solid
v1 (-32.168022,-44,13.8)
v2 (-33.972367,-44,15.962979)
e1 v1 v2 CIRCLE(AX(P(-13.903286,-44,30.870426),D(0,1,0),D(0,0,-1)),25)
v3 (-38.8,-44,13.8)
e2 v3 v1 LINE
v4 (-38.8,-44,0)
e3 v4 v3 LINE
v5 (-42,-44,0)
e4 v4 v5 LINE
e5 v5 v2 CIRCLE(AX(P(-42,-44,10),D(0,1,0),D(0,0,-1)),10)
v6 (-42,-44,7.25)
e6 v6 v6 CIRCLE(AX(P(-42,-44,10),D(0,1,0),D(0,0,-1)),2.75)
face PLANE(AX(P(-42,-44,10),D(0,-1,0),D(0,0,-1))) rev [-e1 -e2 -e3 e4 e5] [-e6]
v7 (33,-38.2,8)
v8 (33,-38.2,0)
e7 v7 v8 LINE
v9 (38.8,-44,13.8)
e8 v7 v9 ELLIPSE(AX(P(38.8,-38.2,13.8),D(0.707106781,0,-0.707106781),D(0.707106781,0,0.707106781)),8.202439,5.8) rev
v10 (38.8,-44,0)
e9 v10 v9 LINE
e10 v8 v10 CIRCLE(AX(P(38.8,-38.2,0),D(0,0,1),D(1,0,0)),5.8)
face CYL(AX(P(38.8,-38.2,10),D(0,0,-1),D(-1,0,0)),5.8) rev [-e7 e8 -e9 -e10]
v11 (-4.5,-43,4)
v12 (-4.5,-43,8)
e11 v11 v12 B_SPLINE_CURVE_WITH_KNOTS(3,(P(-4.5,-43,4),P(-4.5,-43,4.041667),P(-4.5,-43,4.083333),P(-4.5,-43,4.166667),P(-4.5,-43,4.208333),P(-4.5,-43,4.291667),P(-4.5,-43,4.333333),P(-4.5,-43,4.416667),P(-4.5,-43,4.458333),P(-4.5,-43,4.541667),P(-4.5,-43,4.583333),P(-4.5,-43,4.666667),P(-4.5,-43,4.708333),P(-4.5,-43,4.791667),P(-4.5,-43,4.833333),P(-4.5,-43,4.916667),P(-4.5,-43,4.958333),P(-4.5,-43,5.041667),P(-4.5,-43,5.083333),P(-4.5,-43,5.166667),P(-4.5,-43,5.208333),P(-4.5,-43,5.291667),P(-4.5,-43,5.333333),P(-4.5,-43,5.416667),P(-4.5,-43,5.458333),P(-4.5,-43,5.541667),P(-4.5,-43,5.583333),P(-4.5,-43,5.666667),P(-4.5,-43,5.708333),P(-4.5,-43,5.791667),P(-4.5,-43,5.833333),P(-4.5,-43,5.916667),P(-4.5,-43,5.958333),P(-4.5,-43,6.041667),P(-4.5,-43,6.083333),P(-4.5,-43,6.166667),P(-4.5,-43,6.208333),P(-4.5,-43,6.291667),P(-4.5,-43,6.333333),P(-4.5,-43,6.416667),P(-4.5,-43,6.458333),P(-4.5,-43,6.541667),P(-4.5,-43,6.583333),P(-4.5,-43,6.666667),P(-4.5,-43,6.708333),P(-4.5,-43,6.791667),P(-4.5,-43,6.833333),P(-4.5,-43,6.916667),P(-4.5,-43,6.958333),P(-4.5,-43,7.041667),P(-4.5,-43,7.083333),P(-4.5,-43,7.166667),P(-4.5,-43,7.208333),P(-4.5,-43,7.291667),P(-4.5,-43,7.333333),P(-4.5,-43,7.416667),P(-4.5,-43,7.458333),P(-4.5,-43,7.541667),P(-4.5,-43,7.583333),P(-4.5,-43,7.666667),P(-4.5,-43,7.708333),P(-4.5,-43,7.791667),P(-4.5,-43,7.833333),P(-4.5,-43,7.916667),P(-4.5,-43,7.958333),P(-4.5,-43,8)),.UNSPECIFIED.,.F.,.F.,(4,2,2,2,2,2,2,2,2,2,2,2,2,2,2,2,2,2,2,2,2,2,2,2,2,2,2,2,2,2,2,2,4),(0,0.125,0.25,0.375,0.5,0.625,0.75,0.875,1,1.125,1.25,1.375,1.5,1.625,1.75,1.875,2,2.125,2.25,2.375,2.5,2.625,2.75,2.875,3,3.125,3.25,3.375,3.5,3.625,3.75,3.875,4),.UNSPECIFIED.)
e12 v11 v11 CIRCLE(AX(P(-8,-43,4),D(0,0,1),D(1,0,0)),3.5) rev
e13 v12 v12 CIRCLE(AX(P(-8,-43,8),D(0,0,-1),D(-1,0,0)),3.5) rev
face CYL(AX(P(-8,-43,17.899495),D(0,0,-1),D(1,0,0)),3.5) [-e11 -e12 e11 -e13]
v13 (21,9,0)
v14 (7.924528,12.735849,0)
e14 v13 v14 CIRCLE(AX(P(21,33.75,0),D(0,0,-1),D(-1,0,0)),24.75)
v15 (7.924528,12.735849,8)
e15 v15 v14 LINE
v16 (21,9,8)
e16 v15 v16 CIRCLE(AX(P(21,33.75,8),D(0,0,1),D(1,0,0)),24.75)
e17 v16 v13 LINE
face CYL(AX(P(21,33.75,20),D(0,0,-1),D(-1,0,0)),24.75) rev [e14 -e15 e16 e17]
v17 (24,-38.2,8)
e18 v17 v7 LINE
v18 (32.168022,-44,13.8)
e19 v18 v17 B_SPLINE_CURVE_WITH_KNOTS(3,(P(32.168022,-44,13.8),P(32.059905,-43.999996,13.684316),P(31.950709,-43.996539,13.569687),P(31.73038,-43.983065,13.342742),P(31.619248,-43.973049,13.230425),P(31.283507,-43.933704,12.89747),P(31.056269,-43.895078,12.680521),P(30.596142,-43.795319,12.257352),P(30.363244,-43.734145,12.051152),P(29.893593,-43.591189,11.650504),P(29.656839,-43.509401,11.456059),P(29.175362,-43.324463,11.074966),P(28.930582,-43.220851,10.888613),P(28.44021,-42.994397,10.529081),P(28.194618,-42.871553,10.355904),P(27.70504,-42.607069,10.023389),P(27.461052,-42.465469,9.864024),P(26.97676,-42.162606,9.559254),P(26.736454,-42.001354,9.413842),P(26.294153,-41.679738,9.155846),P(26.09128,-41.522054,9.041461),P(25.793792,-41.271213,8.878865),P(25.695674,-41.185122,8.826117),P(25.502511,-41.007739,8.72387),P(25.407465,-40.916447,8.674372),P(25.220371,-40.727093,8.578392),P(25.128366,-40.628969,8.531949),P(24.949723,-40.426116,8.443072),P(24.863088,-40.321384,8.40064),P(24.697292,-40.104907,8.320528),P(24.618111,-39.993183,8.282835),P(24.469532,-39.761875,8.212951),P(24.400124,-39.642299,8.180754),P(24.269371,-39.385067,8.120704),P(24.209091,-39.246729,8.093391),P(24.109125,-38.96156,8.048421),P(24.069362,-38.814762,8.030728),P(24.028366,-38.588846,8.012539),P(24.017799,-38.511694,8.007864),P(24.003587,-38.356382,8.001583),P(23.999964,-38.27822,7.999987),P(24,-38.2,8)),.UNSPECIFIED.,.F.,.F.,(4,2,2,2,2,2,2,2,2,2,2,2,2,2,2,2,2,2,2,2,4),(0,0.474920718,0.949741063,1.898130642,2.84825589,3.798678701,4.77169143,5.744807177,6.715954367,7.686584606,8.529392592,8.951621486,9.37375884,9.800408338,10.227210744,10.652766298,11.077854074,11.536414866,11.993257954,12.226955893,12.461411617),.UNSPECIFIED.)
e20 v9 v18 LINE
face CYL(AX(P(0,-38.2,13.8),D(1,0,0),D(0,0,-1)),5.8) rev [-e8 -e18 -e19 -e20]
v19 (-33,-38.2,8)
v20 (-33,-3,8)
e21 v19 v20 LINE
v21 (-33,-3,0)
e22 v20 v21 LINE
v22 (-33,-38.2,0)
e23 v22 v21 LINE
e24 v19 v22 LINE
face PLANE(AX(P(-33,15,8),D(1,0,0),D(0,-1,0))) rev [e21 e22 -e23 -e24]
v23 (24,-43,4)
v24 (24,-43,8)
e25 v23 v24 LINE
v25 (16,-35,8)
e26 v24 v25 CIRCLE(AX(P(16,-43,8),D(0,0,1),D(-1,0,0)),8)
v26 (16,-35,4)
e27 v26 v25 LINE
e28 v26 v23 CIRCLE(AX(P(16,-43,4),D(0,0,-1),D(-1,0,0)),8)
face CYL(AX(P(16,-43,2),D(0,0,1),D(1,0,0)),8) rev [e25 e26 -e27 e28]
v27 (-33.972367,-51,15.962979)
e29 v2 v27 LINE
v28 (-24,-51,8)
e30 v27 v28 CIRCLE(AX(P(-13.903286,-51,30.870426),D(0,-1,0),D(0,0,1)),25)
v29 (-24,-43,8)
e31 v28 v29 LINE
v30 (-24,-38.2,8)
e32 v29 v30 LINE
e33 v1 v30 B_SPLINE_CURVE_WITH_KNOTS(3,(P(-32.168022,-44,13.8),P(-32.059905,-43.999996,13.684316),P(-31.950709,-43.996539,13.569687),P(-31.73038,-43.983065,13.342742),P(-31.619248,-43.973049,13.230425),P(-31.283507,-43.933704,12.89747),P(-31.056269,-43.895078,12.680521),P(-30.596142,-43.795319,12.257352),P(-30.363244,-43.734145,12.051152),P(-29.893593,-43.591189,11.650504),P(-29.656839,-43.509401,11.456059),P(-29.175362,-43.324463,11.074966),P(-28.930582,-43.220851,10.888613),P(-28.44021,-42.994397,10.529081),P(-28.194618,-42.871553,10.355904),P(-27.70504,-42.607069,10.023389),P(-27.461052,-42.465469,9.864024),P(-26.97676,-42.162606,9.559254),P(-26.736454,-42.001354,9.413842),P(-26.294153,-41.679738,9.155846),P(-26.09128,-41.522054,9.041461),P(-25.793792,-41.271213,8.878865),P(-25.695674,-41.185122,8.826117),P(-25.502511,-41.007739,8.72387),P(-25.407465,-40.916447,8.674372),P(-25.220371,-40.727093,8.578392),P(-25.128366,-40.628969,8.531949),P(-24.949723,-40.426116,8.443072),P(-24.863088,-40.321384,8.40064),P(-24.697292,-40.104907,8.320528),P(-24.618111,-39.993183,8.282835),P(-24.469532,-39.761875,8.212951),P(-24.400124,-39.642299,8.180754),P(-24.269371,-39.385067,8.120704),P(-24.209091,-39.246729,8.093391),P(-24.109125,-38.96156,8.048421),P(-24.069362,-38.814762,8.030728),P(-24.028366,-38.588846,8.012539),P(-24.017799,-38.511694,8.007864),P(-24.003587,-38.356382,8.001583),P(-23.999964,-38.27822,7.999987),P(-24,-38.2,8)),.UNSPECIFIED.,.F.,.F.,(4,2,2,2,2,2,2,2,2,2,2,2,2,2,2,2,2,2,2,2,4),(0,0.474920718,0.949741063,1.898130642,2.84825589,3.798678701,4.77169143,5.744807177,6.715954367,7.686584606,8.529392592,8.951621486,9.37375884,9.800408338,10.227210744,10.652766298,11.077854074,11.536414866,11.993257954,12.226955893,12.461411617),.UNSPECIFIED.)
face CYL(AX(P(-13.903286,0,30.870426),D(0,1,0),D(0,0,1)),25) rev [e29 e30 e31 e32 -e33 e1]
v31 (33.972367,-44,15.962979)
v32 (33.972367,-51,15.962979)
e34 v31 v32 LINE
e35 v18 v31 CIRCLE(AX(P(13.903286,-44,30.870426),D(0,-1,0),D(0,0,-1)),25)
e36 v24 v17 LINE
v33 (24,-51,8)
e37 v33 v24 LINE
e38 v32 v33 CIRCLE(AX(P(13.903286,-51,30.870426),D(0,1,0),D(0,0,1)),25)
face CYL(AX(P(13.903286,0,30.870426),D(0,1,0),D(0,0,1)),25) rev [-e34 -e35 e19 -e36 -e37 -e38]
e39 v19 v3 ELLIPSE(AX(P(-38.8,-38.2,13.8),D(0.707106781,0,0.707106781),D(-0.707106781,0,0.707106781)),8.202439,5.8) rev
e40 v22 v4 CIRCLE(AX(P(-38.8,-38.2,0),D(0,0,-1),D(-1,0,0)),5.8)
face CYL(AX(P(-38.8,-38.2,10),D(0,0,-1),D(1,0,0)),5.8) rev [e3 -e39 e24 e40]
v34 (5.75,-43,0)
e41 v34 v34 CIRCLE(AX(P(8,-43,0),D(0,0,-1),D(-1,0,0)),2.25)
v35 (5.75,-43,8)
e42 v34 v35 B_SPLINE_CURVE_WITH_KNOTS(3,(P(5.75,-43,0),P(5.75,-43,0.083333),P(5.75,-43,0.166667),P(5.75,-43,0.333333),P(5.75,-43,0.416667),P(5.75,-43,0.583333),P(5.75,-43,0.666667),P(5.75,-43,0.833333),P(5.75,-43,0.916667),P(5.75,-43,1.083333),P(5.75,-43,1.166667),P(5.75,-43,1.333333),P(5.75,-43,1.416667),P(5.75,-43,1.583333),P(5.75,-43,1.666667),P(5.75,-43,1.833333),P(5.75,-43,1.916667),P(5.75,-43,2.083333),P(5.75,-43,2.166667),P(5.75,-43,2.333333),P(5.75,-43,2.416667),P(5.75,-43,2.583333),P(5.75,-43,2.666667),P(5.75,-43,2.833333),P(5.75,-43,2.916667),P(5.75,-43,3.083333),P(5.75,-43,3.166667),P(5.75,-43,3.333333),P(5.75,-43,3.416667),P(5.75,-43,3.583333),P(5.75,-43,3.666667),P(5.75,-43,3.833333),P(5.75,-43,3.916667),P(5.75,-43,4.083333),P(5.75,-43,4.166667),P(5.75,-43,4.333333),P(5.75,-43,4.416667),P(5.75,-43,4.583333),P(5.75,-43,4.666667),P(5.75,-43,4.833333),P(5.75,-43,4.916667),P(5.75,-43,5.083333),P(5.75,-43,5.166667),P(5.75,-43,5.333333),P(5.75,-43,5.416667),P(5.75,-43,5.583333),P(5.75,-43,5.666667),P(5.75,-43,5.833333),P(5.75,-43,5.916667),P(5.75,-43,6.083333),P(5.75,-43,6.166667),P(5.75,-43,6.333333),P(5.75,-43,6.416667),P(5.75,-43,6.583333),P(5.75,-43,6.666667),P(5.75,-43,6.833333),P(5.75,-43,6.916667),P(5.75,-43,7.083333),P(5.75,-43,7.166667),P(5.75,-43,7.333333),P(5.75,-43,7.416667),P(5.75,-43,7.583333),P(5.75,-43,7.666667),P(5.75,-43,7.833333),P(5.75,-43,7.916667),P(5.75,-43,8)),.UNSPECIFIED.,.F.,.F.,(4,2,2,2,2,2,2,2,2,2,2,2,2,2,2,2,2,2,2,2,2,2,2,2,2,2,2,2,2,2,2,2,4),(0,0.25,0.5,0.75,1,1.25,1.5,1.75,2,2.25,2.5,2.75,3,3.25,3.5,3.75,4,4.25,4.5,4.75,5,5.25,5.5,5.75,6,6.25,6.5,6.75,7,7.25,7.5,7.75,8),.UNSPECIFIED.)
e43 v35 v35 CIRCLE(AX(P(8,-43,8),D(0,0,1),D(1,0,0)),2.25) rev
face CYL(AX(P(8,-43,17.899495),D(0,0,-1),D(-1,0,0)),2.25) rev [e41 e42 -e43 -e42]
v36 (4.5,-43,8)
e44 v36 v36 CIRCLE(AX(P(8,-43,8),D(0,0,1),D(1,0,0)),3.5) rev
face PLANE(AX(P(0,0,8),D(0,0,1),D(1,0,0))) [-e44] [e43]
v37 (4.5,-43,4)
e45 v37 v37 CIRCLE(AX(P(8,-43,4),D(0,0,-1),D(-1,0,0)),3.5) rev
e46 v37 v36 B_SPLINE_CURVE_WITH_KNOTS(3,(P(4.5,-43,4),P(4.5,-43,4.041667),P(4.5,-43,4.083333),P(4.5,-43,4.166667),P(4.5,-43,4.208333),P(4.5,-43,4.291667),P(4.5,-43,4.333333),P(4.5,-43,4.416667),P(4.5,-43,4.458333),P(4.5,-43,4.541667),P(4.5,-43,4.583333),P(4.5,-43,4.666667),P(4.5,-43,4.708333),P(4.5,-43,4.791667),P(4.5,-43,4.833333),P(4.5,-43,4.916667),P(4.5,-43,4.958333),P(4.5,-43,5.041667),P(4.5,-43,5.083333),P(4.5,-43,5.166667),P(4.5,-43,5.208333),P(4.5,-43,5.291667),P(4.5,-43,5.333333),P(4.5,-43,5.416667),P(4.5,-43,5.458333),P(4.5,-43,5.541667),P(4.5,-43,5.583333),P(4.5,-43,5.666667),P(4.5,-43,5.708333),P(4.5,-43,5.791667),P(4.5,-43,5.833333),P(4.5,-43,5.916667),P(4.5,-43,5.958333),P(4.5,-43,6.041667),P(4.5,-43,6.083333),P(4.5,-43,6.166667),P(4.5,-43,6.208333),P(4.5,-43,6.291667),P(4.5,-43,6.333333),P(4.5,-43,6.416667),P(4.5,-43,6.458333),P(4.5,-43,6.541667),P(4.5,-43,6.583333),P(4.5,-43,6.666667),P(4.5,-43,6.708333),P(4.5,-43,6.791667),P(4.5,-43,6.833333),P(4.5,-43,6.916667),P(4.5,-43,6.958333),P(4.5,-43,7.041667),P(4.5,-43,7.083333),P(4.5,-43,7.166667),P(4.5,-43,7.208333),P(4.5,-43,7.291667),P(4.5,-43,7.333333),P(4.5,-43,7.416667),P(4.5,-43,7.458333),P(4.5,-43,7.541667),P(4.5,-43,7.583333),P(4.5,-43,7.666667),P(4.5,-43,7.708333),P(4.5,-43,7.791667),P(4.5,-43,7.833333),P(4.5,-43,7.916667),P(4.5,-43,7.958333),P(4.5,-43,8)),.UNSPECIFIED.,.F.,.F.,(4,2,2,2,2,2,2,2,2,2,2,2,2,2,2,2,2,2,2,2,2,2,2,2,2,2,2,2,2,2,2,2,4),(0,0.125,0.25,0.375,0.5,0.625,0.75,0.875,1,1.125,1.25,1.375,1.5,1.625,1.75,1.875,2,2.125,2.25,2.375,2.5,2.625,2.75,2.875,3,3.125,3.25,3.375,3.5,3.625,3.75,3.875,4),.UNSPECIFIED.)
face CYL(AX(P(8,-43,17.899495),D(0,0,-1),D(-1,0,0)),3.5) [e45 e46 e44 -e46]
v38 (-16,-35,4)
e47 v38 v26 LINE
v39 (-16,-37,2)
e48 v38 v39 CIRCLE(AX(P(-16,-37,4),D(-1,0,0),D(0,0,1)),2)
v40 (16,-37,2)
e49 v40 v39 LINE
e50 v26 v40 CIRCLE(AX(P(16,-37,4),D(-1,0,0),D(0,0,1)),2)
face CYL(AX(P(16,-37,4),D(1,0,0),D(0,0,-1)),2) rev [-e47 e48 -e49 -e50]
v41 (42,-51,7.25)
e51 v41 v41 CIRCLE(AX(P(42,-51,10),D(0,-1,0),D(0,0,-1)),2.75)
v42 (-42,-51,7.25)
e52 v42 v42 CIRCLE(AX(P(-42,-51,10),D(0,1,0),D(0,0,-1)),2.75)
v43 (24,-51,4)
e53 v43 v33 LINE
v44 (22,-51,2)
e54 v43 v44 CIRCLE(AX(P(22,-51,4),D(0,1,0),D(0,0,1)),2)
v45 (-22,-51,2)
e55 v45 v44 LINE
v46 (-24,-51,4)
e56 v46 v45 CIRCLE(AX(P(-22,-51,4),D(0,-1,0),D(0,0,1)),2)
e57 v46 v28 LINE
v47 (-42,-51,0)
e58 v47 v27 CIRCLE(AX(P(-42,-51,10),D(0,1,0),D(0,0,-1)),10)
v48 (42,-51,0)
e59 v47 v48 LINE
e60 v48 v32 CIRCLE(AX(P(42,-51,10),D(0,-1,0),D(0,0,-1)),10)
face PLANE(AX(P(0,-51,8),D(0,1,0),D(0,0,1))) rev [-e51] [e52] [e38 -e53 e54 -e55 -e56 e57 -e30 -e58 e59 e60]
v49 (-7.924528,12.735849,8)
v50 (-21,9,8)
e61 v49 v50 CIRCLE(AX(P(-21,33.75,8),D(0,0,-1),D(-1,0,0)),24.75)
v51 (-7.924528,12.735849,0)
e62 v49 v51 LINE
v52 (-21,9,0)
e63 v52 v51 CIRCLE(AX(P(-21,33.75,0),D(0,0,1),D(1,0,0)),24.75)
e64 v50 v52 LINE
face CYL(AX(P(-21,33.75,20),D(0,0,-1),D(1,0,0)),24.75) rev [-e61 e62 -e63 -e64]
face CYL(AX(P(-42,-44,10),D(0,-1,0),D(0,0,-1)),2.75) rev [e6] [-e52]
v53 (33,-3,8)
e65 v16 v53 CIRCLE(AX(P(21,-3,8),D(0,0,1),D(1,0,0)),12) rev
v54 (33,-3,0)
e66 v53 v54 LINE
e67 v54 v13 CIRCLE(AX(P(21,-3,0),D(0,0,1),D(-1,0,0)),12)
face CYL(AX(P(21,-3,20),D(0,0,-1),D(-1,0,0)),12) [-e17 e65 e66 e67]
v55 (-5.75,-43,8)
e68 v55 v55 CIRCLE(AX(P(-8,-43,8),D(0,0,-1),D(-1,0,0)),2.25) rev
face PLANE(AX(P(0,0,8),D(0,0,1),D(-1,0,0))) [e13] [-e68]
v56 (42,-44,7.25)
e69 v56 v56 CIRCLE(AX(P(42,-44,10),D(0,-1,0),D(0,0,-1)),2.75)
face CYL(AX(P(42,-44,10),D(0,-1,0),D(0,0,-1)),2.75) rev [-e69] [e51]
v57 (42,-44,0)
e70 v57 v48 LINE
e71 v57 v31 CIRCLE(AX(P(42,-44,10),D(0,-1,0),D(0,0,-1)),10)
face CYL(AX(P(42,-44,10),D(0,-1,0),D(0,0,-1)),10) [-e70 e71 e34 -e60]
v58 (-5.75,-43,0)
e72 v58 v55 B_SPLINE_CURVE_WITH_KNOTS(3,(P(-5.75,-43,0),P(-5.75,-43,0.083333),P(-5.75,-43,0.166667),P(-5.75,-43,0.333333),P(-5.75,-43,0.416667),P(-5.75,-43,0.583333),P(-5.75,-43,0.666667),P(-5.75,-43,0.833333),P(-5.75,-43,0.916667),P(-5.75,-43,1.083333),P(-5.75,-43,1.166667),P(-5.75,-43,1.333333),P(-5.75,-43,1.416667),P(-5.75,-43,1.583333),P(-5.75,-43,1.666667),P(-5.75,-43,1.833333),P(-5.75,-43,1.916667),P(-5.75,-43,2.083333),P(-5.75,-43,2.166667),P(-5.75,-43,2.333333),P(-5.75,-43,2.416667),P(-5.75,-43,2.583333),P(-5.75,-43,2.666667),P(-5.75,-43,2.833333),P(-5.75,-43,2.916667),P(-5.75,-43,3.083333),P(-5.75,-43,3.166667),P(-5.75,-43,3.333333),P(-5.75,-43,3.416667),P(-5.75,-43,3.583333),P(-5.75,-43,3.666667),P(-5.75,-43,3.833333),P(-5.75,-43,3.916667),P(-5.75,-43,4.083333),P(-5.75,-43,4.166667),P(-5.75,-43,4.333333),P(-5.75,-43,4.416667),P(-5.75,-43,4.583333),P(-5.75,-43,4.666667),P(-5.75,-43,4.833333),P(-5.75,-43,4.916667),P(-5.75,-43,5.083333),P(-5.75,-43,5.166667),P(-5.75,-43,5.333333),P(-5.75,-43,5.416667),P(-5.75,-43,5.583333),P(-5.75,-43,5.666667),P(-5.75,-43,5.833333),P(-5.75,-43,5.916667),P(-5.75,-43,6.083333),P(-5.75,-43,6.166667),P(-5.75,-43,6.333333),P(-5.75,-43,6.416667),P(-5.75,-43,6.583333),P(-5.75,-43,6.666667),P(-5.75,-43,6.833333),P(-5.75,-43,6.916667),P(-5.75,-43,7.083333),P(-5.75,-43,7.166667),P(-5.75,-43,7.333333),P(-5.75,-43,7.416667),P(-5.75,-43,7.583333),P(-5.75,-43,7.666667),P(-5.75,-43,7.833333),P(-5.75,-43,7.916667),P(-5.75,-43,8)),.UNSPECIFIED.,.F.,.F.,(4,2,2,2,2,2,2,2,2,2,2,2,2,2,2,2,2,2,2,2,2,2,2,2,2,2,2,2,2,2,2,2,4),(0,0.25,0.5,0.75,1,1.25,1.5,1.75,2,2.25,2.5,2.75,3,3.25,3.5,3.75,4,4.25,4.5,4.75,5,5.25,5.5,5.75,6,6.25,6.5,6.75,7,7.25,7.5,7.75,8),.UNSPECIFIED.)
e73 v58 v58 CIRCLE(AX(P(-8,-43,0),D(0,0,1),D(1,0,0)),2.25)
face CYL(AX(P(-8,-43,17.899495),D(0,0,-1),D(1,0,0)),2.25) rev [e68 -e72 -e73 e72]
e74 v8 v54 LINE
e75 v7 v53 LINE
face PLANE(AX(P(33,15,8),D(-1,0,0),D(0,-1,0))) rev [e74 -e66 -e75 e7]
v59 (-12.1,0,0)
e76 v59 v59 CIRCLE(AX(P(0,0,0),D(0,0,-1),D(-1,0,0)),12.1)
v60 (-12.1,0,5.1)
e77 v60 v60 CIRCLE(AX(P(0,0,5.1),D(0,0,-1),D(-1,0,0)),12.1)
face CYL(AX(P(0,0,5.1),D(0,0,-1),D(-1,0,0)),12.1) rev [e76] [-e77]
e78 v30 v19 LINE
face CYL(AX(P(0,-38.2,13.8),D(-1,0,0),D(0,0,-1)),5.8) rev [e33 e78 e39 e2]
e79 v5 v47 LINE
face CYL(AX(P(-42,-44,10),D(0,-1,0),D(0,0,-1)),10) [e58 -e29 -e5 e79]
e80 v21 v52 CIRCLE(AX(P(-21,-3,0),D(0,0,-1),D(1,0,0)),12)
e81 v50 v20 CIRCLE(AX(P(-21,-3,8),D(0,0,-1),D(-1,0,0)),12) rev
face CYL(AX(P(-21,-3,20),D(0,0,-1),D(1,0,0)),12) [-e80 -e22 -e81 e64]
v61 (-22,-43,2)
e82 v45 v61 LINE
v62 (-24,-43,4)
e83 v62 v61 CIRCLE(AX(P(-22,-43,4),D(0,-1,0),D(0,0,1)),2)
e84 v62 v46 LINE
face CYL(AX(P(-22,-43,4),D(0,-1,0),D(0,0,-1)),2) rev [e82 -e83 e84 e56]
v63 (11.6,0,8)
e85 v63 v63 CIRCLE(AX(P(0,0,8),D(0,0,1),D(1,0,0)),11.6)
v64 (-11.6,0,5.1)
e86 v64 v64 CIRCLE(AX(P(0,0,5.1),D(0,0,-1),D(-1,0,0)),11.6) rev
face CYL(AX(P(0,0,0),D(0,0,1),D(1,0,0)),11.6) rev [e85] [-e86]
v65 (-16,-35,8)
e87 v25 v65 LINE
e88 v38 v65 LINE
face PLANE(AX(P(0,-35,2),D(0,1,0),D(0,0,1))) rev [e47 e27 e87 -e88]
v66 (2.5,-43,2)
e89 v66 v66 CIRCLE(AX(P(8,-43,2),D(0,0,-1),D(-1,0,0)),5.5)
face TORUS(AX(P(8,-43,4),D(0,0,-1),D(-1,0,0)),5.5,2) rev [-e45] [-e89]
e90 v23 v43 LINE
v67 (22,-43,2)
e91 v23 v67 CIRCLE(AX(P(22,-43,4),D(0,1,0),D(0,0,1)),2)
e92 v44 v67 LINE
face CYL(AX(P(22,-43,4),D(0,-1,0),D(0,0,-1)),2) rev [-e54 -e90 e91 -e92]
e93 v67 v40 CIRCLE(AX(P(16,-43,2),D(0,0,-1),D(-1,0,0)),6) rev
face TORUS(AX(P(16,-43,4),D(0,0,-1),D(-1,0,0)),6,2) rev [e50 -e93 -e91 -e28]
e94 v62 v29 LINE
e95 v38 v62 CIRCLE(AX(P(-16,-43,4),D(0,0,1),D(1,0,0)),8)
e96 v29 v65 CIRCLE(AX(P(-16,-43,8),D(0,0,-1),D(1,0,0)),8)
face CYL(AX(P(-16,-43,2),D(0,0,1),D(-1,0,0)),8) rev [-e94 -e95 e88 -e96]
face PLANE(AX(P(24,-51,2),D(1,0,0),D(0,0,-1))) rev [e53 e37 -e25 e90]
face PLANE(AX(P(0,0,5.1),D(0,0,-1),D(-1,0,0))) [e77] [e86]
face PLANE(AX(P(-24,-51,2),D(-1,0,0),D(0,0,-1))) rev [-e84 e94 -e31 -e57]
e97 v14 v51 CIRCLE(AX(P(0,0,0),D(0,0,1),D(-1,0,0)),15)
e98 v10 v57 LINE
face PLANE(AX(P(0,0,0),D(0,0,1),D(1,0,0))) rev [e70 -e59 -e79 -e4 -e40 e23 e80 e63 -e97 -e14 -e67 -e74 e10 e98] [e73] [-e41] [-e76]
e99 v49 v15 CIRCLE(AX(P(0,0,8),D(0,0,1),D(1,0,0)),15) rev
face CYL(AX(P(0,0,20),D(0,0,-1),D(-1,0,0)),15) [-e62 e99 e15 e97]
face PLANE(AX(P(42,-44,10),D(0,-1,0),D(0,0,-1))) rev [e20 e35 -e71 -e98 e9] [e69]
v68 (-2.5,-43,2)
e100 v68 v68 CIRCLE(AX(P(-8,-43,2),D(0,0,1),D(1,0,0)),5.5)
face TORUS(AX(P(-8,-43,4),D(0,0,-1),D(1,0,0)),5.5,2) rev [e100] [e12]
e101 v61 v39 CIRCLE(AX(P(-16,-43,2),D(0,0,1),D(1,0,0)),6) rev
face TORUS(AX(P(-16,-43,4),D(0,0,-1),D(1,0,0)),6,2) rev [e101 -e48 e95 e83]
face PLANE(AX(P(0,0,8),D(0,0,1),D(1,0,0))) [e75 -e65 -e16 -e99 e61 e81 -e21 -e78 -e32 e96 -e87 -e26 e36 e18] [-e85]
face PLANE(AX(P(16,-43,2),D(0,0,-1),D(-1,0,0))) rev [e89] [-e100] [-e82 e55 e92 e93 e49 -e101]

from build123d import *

# Parameters (mm, degrees)
SKETCH1_W           = 33
SKETCH1_H           = 66
BOSS_EXTRUDE1_DEPTH = 8
SKETCH3_R           = 11.6
CUT_EXTRUDE1_DEPTH  = 62.269894728
SKETCH6_R           = 12.1
CUT_EXTRUDE2_DEPTH  = 5.1
SKETCH10_R          = 2.75
BOSS_EXTRUDE4_DEPTH = 7
CUT_EXTRUDE3_DEPTH  = 6
SKETCH12_R          = 2.75
CUT_EXTRUDE4_DEPTH  = 6
FILLET7_R           = 2
FILLET5_R           = 25
FILLET6_R           = 5.8
SKETCH13_R          = 3.5
SKETCH13_R_2        = 2.25
BOSS_EXTRUDE5_DEPTH = 8
FILLET8_R           = 2
CUT_EXTRUDE5_DEPTH  = 76.531450471


with BuildPart() as part:
    # Sketch1 → Boss-Extrude1 (new body)
    with BuildSketch(Plane.XY):
        with Locations((16.5, -18)):
            Rectangle(SKETCH1_W, SKETCH1_H)
    extrude(amount=BOSS_EXTRUDE1_DEPTH)

    # Sketch3 → Cut-Extrude1 (cut, through all)
    with BuildSketch(Plane.XY.offset(8)):
        Circle(SKETCH3_R)
    extrude(amount=-CUT_EXTRUDE1_DEPTH, mode=Mode.SUBTRACT)

    # Sketch6 → Cut-Extrude2 (cut)
    with BuildSketch(Plane(origin=(0, 0, 0), x_dir=(-1, 0, 0), z_dir=(0, 0, -1))):
        Circle(SKETCH6_R)
    extrude(amount=-CUT_EXTRUDE2_DEPTH, mode=Mode.SUBTRACT)

    # Sketch10 → Boss-Extrude4 (add)
    with BuildSketch(Plane.XZ.offset(51)):
        with BuildLine():
            Line((42, 0), (32, 0))
            Line((32, 0), (32, 10))
            ThreePointArc((32, 10), (49.071067812, 17.071067812), (42, 0))
        make_face()
        with Locations(Location((42, 10, 0), (0, 0, 270))):
            Circle(SKETCH10_R, mode=Mode.SUBTRACT)
    extrude(amount=-BOSS_EXTRUDE4_DEPTH)

    # Sketch11 → Cut-Extrude3 (cut)
    with BuildSketch(Plane.XY.offset(8)):
        with BuildLine():
            Line((0, -51), (24, -51))
            Line((24, -51), (24, -43))
            ThreePointArc((24, -43), (21.656854249, -37.343145751), (16, -35))
            Line((16, -35), (0, -35))
            Line((0, -35), (0, -51))
        make_face()
    extrude(amount=-CUT_EXTRUDE3_DEPTH, mode=Mode.SUBTRACT)

    # Sketch12 → Cut-Extrude4 (cut)
    with BuildSketch(Plane.XY.offset(2)):
        with Locations((8, -43)):
            Circle(SKETCH12_R)
    extrude(amount=-CUT_EXTRUDE4_DEPTH, mode=Mode.SUBTRACT)

    # Fillet7
    fillet7_edges = [part.edges().sort_by_distance(p)[0] for p in [
        (8, -35, 2),
        (21.656854249, -37.343145751, 2),
        (24, -47, 2),
    ]]
    fillet(fillet7_edges, radius=FILLET7_R)

    # Fillet5
    # the kernel refuses this fillet: 25 mm, written as the material it adds along each edge
    with BuildSketch(Plane(origin=(32, -44, 8), x_dir=(-1, 0, 0), z_dir=(0, -1, 0))) as fillet5_piece_1:
        with BuildLine():
            CenterArc((18.096713956, -22.870425604), FILLET5_R, 113.820244592, 29.574545381)
            Line((-1.972367441, -7.962978744), (-3.979275581, -6.472234058))
            ThreePointArc((-3.979275581, -6.472234058), (-2.5, -2), (-2.5, 0))
            Line((-2.5, 0), (0, 2.5))
            ThreePointArc((0, 2.5), (4, 2.5), (6.990328604, 2.28704256))
            Line((6.990328604, 2.28704256), (8, 0))
        make_face()
    extrude(amount=7)

    # Fillet6
    # the kernel refuses this fillet: 5.8 mm, written as the material it adds along each edge
    with BuildSketch(Plane(origin=(33, -44, 0), x_dir=(0, 1, 0), z_dir=(0, 0, 1))) as fillet6_piece_1:
        with BuildLine():
            CenterArc((FILLET6_R, -FILLET6_R), FILLET6_R, 90, 90)
            Line((0, -FILLET6_R), (0, 0))
            Line((0, 0), (FILLET6_R, 0))
        make_face()
    extrude(amount=8)
    with BuildSketch(Plane(origin=(33, -44, 8), x_dir=(0, 1, 0), z_dir=(-1, 0, 0))) as fillet6_piece_2_section:
        with BuildLine():
            CenterArc((FILLET6_R, -FILLET6_R), FILLET6_R, 90, 90)
            Line((0, -FILLET6_R), (0, 0))
            Line((0, 0), (FILLET6_R, 0))
        make_face()
    fillet6_piece_2 = extrude(amount=23.5, mode=Mode.PRIVATE)
    fillet6_piece_2 = fillet6_piece_2 - Plane(origin=(13.903286044, -44, 30.870425604), x_dir=(-1, 0, 0), z_dir=(0, 1, 0)) * Cylinder(25, 71, mode=Mode.PRIVATE)
    add(fillet6_piece_2)
    with BuildSketch(Plane(origin=(47.5, -44, 8), x_dir=(0, 1, 0), z_dir=(-1, 0, 0))) as fillet6_piece_3a_section:
        with BuildLine():
            CenterArc((FILLET6_R, -FILLET6_R), FILLET6_R, 90, 90)
            Line((0, -FILLET6_R), (0, 0))
            Line((0, 0), (FILLET6_R, 0))
        make_face()
    fillet6_piece_3a = extrude(amount=23.5, mode=Mode.PRIVATE)
    fillet6_piece_3a = fillet6_piece_3a - Plane(origin=(42, -44, 10), x_dir=(0, 0, -1), z_dir=(0, -1, 0)) * Cylinder(2.75, 71, mode=Mode.PRIVATE)
    fillet6_piece_3a = split(fillet6_piece_3a, bisect_by=Plane(origin=(33, -44, 8), z_dir=(1, 0, 0)), keep=Keep.TOP, mode=Mode.PRIVATE)
    with BuildSketch(Plane(origin=(33, -44, 0), x_dir=(0, 1, 0), z_dir=(0, 0, 1))) as fillet6_piece_3b_section:
        with BuildLine():
            CenterArc((FILLET6_R, -FILLET6_R), FILLET6_R, 90, 90)
            Line((0, -FILLET6_R), (0, 0))
            Line((0, 0), (FILLET6_R, 0))
        make_face()
    fillet6_piece_3b = extrude(amount=22.5, mode=Mode.PRIVATE)
    fillet6_piece_3b = split(fillet6_piece_3b, bisect_by=Plane(origin=(33, -44, 8), z_dir=(0, 0, 1)), keep=Keep.TOP, mode=Mode.PRIVATE)
    fillet6_piece_3b = fillet6_piece_3b & Plane(origin=(42, -44, 10), x_dir=(-1, 0, 0), z_dir=(0, -1, 0)) * Cylinder(10, 69, mode=Mode.PRIVATE)
    fillet6_piece_3 = fillet6_piece_3a & fillet6_piece_3b
    add(fillet6_piece_3)

    # Sketch13 → Boss-Extrude5 (add)
    with BuildSketch(Plane(origin=(0, 0, 0), x_dir=(-1, 0, 0), z_dir=(0, 0, -1))):
        with Locations((-8, -43)):
            Circle(SKETCH13_R)
        with Locations((-8, -43)):
            Circle(SKETCH13_R_2, mode=Mode.SUBTRACT)
    extrude(amount=-BOSS_EXTRUDE5_DEPTH)

    # Fillet8
    fillet8_edges = [part.edges().sort_by_distance(p)[0] for p in [
        (11.5, -43, 2),
    ]]
    fillet(fillet8_edges, radius=FILLET8_R)

    # Sketch15 → Cut-Extrude5 (cut, through all)
    with BuildSketch(Plane(origin=(0, 0, 0), x_dir=(-1, 0, 0), z_dir=(0, 0, -1))):
        with BuildLine():
            Line((0, 15), (-33, 15))
            Line((-33, 15), (-33, -3))
            ThreePointArc((-33, -3), (-29.485281374, 5.485281374), (-21, 9))
            ThreePointArc((-21, 9), (-14.200652085, 9.952282296), (-7.924528302, 12.735849057))
            ThreePointArc((-7.924528302, 12.735849057), (-4.120816918, 14.422859215), (0, 15))
        make_face()
    extrude(amount=-CUT_EXTRUDE5_DEPTH, mode=Mode.SUBTRACT)

    # Mirror1: part across plane


with BuildPart() as part_1:
    add(part.part)
    add(part.part.mirror(Plane(origin=(0, 15, 8), x_dir=(0, 0, 1), z_dir=(1, 0, 0))))


solid = part_1.part
